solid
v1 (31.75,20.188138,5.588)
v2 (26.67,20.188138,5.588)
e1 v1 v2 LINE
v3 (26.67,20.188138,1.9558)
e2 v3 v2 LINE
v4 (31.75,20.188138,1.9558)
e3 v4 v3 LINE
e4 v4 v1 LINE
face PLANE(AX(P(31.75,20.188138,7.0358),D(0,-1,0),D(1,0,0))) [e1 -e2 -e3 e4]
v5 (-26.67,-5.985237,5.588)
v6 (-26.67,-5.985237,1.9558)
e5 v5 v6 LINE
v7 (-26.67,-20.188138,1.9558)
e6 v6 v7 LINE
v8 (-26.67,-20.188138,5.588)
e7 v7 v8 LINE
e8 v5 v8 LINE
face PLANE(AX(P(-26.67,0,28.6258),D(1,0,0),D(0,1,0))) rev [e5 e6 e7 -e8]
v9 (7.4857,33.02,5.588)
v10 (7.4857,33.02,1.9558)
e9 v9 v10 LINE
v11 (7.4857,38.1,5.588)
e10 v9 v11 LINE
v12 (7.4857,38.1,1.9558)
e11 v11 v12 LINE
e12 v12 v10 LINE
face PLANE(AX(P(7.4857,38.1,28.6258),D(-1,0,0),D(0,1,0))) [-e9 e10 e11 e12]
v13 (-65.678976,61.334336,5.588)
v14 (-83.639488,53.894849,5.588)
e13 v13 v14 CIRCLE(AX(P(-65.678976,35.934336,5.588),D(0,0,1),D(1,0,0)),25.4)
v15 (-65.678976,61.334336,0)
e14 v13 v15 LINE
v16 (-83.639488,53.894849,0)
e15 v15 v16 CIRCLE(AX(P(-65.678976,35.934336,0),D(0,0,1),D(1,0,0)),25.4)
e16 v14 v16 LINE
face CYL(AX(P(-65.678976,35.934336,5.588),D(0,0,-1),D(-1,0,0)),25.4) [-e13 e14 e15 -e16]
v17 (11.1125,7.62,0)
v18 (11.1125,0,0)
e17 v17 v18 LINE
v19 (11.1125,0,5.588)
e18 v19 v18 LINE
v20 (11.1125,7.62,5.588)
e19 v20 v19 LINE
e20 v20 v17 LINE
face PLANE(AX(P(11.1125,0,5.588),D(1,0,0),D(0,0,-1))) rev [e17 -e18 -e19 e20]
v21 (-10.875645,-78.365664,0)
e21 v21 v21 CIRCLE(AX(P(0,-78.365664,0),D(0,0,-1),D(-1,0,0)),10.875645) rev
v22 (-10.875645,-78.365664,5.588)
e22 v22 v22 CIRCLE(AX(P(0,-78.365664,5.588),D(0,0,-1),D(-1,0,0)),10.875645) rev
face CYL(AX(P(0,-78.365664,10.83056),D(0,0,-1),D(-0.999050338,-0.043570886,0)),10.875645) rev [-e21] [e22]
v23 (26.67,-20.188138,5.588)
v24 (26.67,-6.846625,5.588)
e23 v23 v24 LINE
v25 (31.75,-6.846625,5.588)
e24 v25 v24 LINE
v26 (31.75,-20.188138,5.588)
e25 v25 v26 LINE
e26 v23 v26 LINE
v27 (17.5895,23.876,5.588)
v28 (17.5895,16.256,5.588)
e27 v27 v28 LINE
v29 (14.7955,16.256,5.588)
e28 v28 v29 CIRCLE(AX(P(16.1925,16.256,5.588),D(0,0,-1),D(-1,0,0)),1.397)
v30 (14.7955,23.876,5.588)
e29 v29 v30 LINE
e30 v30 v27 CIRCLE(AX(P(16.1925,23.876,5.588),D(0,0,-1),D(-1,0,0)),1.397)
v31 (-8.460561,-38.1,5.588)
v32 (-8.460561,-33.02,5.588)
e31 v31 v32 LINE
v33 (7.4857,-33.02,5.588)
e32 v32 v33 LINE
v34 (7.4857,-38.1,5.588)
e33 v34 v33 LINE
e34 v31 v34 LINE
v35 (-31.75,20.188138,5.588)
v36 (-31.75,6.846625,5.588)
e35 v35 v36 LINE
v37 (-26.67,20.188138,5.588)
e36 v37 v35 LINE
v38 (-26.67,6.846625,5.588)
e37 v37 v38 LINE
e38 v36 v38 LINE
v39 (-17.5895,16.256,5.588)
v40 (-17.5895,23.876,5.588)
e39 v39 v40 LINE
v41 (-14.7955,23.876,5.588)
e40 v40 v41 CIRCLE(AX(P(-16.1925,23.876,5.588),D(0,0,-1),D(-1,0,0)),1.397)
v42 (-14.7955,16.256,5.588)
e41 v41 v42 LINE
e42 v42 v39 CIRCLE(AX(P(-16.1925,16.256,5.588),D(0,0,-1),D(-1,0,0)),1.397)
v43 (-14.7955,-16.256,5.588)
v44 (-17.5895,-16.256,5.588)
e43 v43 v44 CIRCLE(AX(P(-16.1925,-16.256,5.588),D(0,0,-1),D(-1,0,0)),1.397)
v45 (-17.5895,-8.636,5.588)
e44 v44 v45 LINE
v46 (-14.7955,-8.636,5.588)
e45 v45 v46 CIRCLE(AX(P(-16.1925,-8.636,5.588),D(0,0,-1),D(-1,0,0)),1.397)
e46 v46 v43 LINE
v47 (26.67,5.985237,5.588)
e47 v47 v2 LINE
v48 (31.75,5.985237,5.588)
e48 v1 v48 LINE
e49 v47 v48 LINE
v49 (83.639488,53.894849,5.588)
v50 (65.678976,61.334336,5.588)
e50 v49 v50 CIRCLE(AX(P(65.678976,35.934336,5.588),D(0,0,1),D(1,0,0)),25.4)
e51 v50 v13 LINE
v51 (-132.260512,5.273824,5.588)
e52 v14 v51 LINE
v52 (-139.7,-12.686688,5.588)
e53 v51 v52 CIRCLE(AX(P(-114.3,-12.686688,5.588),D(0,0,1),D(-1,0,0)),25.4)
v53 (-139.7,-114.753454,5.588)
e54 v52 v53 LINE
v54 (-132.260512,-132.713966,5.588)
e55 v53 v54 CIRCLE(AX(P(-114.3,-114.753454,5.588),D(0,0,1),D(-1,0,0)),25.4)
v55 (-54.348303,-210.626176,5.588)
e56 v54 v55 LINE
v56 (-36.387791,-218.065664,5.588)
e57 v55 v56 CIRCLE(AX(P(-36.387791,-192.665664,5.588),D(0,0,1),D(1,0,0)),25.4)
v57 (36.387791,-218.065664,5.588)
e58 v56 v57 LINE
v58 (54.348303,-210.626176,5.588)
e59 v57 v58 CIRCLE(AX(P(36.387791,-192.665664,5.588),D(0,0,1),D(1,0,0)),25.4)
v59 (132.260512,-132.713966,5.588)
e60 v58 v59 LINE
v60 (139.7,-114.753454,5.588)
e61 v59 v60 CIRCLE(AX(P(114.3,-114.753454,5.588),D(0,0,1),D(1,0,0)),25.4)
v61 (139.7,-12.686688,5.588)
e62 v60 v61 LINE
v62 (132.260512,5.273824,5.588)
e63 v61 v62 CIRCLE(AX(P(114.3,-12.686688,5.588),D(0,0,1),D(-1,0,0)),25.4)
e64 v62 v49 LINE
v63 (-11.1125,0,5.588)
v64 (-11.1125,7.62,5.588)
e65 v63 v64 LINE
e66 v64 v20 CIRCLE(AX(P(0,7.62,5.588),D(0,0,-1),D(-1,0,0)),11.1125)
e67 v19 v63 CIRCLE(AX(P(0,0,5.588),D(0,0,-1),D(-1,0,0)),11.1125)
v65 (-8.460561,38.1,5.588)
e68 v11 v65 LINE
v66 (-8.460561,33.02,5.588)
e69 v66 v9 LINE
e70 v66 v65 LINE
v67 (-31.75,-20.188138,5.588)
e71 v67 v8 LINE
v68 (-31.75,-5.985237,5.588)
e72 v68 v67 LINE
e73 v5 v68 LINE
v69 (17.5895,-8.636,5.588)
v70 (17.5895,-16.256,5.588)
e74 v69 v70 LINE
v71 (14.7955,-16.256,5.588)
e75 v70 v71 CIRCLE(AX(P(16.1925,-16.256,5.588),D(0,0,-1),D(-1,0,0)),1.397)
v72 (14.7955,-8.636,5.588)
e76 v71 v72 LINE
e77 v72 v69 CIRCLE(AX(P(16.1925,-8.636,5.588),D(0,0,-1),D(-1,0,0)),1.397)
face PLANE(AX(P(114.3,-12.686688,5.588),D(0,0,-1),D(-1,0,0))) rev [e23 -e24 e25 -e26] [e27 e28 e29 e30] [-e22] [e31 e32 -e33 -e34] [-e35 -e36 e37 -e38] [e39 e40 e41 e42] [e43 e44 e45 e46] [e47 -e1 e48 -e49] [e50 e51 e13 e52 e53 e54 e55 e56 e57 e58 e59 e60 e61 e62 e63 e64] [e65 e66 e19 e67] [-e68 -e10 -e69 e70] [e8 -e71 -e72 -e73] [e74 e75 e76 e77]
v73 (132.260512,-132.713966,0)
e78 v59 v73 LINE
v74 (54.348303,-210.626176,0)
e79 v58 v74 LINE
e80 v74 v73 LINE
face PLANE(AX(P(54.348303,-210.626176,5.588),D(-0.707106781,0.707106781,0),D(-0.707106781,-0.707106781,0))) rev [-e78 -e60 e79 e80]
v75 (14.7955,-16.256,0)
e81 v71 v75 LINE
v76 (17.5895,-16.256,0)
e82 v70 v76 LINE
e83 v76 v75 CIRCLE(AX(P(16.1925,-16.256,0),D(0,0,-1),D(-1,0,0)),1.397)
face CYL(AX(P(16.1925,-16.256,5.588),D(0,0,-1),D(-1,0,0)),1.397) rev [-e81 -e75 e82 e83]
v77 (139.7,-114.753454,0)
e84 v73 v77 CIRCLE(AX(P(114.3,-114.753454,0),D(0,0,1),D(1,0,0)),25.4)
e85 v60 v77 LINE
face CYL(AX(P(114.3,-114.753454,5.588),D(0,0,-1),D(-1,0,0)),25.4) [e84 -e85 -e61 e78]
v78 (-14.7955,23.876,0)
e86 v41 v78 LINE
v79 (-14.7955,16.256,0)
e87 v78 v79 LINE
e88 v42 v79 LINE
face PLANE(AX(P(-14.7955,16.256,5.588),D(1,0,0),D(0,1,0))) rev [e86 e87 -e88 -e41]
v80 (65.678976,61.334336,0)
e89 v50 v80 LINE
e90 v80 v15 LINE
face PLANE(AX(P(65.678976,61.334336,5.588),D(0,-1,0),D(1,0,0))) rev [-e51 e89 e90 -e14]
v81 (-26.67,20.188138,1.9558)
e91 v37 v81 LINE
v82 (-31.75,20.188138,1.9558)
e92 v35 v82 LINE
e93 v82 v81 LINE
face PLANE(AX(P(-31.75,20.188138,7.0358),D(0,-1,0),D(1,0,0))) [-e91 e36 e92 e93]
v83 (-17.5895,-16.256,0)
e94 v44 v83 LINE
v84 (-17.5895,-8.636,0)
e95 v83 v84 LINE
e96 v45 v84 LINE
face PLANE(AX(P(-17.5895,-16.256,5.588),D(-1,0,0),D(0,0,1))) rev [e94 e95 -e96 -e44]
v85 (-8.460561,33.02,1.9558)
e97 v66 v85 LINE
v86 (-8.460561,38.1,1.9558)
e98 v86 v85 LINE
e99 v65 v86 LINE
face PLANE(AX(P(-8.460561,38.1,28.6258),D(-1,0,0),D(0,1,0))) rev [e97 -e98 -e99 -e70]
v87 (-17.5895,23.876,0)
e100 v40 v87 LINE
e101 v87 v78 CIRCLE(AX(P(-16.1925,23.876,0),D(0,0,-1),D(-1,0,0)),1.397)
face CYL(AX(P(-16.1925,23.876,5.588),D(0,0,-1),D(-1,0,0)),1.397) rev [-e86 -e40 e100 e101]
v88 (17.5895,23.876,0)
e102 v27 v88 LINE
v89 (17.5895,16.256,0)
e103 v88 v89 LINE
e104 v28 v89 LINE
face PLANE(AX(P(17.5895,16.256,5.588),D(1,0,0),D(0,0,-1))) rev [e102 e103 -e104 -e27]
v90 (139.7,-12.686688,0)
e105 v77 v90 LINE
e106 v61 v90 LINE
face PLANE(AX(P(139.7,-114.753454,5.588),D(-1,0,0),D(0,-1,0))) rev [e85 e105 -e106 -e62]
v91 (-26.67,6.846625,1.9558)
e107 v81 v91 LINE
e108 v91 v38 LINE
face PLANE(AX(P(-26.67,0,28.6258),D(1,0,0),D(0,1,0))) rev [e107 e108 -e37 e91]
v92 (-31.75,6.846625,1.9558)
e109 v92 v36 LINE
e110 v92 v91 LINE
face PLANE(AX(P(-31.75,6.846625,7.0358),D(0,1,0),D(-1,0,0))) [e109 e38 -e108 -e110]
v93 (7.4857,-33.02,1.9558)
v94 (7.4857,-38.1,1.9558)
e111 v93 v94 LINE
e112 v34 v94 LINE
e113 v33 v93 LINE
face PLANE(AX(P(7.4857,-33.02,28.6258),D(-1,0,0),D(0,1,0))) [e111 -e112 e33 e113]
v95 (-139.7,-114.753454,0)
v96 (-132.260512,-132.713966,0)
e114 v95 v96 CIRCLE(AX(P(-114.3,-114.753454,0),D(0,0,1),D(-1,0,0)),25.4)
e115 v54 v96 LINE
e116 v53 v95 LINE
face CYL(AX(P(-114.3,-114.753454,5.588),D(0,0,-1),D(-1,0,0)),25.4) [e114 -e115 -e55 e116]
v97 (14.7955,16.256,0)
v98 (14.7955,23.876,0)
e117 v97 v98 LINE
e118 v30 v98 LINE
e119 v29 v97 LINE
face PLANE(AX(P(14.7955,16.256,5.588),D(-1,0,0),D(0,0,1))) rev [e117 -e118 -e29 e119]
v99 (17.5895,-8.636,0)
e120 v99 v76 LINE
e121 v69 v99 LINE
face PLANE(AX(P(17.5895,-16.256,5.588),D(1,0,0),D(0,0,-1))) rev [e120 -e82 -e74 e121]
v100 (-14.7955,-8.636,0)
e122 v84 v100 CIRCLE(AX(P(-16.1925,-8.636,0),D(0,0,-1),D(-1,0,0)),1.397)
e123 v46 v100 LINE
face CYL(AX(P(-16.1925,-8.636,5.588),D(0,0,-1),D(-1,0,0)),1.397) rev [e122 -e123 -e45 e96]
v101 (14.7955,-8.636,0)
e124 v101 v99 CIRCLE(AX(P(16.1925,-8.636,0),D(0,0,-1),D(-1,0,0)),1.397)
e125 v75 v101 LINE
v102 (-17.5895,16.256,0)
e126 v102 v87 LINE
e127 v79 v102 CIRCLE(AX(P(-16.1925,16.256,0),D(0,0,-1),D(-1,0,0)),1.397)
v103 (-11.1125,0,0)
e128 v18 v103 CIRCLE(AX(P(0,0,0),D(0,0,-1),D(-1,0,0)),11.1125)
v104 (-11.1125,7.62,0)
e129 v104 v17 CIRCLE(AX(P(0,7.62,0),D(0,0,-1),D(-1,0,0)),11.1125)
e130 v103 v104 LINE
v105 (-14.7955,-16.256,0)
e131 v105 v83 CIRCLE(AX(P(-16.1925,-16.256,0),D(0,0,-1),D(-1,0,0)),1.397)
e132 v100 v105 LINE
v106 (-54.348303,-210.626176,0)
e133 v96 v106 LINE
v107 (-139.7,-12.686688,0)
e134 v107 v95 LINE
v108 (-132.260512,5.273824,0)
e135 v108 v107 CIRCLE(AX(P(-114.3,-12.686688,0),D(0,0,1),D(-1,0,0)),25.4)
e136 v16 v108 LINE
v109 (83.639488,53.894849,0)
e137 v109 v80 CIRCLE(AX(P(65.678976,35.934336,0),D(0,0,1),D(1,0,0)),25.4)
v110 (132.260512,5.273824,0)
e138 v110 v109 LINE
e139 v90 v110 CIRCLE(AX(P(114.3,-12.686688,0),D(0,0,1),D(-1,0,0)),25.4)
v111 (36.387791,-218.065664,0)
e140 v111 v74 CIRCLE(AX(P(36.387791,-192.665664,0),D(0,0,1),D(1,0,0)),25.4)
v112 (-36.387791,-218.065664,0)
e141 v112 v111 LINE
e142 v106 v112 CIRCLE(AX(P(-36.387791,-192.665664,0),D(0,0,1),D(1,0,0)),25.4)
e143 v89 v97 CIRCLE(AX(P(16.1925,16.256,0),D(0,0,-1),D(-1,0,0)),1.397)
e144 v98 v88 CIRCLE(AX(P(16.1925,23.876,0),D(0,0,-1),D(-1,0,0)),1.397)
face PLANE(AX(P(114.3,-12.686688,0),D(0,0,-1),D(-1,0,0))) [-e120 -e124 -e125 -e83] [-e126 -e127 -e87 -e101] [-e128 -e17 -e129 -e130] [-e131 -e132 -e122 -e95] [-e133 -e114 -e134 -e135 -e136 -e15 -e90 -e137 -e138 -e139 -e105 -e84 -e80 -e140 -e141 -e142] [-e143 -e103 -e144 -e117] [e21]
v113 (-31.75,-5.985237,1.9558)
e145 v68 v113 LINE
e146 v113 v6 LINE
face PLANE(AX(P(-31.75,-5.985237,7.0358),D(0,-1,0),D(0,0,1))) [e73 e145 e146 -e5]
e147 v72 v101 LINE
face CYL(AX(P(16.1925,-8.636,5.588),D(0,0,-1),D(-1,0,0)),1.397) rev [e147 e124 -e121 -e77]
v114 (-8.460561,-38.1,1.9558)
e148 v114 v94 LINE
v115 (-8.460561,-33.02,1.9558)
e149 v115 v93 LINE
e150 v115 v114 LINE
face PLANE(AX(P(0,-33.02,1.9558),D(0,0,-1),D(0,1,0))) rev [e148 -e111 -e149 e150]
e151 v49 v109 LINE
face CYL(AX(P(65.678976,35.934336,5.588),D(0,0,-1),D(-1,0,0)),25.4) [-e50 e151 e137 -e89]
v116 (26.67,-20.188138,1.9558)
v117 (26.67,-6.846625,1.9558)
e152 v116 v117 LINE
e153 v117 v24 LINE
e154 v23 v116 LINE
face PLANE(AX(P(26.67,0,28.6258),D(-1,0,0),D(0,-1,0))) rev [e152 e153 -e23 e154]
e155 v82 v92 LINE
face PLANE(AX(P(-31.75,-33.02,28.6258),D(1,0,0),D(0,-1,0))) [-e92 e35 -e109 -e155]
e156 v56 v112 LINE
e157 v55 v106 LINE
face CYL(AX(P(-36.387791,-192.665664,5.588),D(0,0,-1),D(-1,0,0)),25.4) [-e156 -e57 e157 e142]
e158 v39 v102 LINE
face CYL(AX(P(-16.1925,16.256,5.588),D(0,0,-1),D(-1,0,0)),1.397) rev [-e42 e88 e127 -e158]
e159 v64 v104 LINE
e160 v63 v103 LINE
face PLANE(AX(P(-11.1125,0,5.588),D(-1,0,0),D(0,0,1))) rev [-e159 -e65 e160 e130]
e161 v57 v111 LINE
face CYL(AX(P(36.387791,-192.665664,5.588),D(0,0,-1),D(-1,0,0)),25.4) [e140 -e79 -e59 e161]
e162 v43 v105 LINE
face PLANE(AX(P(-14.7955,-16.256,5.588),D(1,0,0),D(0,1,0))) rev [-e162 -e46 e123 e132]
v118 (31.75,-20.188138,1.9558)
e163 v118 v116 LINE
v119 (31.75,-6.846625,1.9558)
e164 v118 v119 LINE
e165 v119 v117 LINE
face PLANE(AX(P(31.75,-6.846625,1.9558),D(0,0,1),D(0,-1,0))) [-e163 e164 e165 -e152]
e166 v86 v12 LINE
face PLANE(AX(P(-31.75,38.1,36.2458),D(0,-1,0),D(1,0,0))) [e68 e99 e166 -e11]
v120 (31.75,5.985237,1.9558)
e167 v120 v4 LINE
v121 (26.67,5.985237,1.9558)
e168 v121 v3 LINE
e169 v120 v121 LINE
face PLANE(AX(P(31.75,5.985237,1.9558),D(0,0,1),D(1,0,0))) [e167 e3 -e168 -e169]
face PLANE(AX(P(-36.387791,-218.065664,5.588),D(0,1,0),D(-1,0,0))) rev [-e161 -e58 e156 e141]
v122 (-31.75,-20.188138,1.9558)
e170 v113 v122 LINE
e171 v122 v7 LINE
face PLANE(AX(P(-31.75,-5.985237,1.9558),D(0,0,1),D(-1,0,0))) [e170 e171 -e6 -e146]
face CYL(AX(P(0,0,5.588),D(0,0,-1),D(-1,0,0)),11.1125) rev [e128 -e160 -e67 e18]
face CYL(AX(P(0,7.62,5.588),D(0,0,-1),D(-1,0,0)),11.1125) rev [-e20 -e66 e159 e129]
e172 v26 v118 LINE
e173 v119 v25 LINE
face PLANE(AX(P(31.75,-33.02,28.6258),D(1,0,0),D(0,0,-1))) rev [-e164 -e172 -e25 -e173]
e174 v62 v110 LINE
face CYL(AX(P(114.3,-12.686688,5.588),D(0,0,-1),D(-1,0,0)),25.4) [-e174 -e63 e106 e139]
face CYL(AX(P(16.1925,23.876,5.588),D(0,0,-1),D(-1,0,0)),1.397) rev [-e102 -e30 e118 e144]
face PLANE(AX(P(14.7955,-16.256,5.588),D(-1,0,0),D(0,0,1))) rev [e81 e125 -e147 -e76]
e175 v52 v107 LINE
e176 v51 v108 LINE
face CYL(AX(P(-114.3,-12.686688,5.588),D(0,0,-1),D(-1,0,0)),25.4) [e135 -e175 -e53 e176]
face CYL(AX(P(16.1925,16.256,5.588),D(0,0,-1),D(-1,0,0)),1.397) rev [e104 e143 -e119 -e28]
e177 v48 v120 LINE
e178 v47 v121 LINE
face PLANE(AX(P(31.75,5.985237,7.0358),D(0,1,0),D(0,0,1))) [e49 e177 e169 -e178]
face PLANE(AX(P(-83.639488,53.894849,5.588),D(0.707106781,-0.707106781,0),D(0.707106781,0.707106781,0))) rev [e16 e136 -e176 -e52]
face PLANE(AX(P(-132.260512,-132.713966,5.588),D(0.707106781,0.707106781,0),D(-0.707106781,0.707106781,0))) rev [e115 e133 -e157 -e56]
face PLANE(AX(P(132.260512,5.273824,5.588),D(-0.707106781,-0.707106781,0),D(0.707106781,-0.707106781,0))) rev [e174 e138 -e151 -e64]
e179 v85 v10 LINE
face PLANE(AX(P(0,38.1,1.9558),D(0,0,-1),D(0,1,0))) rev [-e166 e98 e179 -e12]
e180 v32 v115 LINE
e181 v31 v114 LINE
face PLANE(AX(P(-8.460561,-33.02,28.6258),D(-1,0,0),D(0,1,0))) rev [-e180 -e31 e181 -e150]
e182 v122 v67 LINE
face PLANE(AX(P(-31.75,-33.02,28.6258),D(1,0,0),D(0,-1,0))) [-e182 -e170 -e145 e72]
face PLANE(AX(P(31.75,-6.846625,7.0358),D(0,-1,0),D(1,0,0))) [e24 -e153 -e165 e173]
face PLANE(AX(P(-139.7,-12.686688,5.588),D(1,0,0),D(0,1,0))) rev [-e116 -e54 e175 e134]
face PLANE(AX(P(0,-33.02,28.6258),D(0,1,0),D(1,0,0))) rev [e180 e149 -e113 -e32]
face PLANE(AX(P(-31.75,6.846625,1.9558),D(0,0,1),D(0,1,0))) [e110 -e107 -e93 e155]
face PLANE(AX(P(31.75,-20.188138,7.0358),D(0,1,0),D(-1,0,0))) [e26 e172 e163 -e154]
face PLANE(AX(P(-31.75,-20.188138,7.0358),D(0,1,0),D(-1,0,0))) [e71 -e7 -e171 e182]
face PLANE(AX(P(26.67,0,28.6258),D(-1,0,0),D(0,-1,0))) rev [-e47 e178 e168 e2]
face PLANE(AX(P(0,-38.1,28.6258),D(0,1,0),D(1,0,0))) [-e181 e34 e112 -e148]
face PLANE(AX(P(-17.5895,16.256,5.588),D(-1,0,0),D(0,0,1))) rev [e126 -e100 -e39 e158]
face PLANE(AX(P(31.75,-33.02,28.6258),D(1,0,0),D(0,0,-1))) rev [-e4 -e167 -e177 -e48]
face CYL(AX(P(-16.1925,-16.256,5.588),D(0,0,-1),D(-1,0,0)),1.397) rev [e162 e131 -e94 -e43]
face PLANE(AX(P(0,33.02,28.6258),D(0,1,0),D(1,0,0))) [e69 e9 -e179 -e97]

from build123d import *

# Parameters (mm, degrees)
BOSS_EXTRUDE1_DEPTH = 5.588
CUT_EXTRUDE1_DEPTH  = 260.036579176
CUT_EXTRUDE2_DEPTH  = 260.036579176
CUT_EXTRUDE3_DEPTH  = 260.036579176
CAVITY1_START       = 1.9558
CAVITY1_OUTLINE_W   = 15.946260678
CAVITY1_OUTLINE_H   = 5.08
CAVITY1_OUTLINE_W_2 = 5.08
CAVITY1_OUTLINE_H_2 = 14.202900977
CAVITY1_OUTLINE_H_3 = 13.341513611
CAVITY1_DEPTH       = 3.6322
CAVITY2_OUTLINE_R   = 10.875645
CAVITY2_DEPTH       = 5.588


# Read off the part's stored shape, not the designer's step: Cavity1, Cavity2
with BuildPart() as part:
    # Sketch1 → Boss-Extrude1 (new body)
    with BuildSketch(Plane.XY):
        with BuildLine():
            Line((65.678975516, 61.334336478), (-65.678975516, 61.334336478))
            ThreePointArc((-65.678975516, 61.334336478), (-75.399134698, 59.400876604), (-83.639487758, 53.89484872))
            Line((-83.639487758, 53.89484872), (-132.260512242, 5.273824236))
            ThreePointArc((-132.260512242, 5.273824236), (-137.766540126, -2.966528824), (-139.7, -12.686688006))
            Line((-139.7, -12.686688006), (-139.7, -114.753454114))
            ThreePointArc((-139.7, -114.753454114), (-137.766540126, -124.473613296), (-132.260512242, -132.713966356))
            Line((-132.260512242, -132.713966356), (-54.348302834, -210.626175764))
            ThreePointArc((-54.348302834, -210.626175764), (-46.107949774, -216.132203648), (-36.387790592, -218.065663522))
            Line((-36.387790592, -218.065663522), (36.387790592, -218.065663522))
            ThreePointArc((36.387790592, -218.065663522), (46.107949774, -216.132203648), (54.348302834, -210.626175764))
            Line((54.348302834, -210.626175764), (132.260512242, -132.713966356))
            ThreePointArc((132.260512242, -132.713966356), (137.766540126, -124.473613296), (139.7, -114.753454114))
            Line((139.7, -114.753454114), (139.7, -12.686688006))
            ThreePointArc((139.7, -12.686688006), (137.766540126, -2.966528824), (132.260512242, 5.273824236))
            Line((132.260512242, 5.273824236), (83.639487758, 53.89484872))
            ThreePointArc((83.639487758, 53.89484872), (75.399134698, 59.400876604), (65.678975516, 61.334336478))
        make_face()
    extrude(amount=BOSS_EXTRUDE1_DEPTH)

    # Sketch3 → Cut-Extrude1 (cut, through all)
    with BuildSketch(Plane(origin=(0, 0, 0), x_dir=(-1, 0, 0), z_dir=(0, 0, -1))):
        with BuildLine():
            Line((-17.5895, 16.256), (-17.5895, 23.876))
            ThreePointArc((-17.5895, 23.876), (-16.1925, 25.273), (-14.7955, 23.876))
            Line((-14.7955, 23.876), (-14.7955, 16.256))
            ThreePointArc((-14.7955, 16.256), (-16.1925, 14.859), (-17.5895, 16.256))
        make_face()
        with BuildLine():
            Line((14.7955, 16.256), (14.7955, 23.876))
            ThreePointArc((14.7955, 23.876), (16.1925, 25.273), (17.5895, 23.876))
            Line((17.5895, 23.876), (17.5895, 16.256))
            ThreePointArc((17.5895, 16.256), (16.1925, 14.859), (14.7955, 16.256))
        make_face()
        with BuildLine():
            Line((-17.5895, -16.256), (-17.5895, -8.636))
            ThreePointArc((-17.5895, -8.636), (-16.1925, -7.239), (-14.7955, -8.636))
            Line((-14.7955, -8.636), (-14.7955, -16.256))
            ThreePointArc((-14.7955, -16.256), (-16.1925, -17.653), (-17.5895, -16.256))
        make_face()
    extrude(amount=-CUT_EXTRUDE1_DEPTH, mode=Mode.SUBTRACT)

    # Sketch6 → Cut-Extrude2 (cut, through all)
    with BuildSketch(Plane(origin=(0, 0, 0), x_dir=(-1, 0, 0), z_dir=(0, 0, -1))):
        with BuildLine():
            Line((-11.1125, 0), (-11.1125, 7.62))
            ThreePointArc((-11.1125, 7.62), (0, 18.7325), (11.1125, 7.62))
            Line((11.1125, 7.62), (11.1125, 0))
            ThreePointArc((11.1125, 0), (0, -11.1125), (-11.1125, 0))
        make_face()
    extrude(amount=-CUT_EXTRUDE2_DEPTH, mode=Mode.SUBTRACT)

    # Sketch5 → Cut-Extrude3 (cut, through all)
    with BuildSketch(Plane(origin=(0, 0, 0), x_dir=(-1, 0, 0), z_dir=(0, 0, -1))):
        with BuildLine():
            Line((14.7955, -16.256), (14.7955, -8.636))
            ThreePointArc((14.7955, -8.636), (16.1925, -7.239), (17.5895, -8.636))
            Line((17.5895, -8.636), (17.5895, -16.256))
            ThreePointArc((17.5895, -16.256), (16.1925, -17.653), (14.7955, -16.256))
        make_face()
    extrude(amount=-CUT_EXTRUDE3_DEPTH, mode=Mode.SUBTRACT)

    # Cavity1 outline → Cavity1 (cut)
    with BuildSketch(Plane.XY.offset(CAVITY1_START)):
        with Locations((-0.487430597, 35.56)):
            Rectangle(CAVITY1_OUTLINE_W, CAVITY1_OUTLINE_H)
        with Locations((-0.487430597, -35.56)):
            Rectangle(CAVITY1_OUTLINE_W, CAVITY1_OUTLINE_H)
        with Locations((29.21, 13.086687708)):
            Rectangle(CAVITY1_OUTLINE_W_2, CAVITY1_OUTLINE_H_2)
        with Locations((-29.21, 13.517381391)):
            Rectangle(CAVITY1_OUTLINE_W_2, CAVITY1_OUTLINE_H_3)
        with Locations((29.21, -13.517381391)):
            Rectangle(CAVITY1_OUTLINE_W_2, CAVITY1_OUTLINE_H_3)
        with Locations((-29.21, -13.086687708)):
            Rectangle(CAVITY1_OUTLINE_W_2, CAVITY1_OUTLINE_H_2)
    extrude(amount=CAVITY1_DEPTH, mode=Mode.SUBTRACT)

    # Cavity2 outline → Cavity2 (cut)
    with BuildSketch(Plane.XY):
        with Locations((0, -78.365663522)):
            Circle(CAVITY2_OUTLINE_R)
    extrude(amount=CAVITY2_DEPTH, mode=Mode.SUBTRACT)


solid = part.part
